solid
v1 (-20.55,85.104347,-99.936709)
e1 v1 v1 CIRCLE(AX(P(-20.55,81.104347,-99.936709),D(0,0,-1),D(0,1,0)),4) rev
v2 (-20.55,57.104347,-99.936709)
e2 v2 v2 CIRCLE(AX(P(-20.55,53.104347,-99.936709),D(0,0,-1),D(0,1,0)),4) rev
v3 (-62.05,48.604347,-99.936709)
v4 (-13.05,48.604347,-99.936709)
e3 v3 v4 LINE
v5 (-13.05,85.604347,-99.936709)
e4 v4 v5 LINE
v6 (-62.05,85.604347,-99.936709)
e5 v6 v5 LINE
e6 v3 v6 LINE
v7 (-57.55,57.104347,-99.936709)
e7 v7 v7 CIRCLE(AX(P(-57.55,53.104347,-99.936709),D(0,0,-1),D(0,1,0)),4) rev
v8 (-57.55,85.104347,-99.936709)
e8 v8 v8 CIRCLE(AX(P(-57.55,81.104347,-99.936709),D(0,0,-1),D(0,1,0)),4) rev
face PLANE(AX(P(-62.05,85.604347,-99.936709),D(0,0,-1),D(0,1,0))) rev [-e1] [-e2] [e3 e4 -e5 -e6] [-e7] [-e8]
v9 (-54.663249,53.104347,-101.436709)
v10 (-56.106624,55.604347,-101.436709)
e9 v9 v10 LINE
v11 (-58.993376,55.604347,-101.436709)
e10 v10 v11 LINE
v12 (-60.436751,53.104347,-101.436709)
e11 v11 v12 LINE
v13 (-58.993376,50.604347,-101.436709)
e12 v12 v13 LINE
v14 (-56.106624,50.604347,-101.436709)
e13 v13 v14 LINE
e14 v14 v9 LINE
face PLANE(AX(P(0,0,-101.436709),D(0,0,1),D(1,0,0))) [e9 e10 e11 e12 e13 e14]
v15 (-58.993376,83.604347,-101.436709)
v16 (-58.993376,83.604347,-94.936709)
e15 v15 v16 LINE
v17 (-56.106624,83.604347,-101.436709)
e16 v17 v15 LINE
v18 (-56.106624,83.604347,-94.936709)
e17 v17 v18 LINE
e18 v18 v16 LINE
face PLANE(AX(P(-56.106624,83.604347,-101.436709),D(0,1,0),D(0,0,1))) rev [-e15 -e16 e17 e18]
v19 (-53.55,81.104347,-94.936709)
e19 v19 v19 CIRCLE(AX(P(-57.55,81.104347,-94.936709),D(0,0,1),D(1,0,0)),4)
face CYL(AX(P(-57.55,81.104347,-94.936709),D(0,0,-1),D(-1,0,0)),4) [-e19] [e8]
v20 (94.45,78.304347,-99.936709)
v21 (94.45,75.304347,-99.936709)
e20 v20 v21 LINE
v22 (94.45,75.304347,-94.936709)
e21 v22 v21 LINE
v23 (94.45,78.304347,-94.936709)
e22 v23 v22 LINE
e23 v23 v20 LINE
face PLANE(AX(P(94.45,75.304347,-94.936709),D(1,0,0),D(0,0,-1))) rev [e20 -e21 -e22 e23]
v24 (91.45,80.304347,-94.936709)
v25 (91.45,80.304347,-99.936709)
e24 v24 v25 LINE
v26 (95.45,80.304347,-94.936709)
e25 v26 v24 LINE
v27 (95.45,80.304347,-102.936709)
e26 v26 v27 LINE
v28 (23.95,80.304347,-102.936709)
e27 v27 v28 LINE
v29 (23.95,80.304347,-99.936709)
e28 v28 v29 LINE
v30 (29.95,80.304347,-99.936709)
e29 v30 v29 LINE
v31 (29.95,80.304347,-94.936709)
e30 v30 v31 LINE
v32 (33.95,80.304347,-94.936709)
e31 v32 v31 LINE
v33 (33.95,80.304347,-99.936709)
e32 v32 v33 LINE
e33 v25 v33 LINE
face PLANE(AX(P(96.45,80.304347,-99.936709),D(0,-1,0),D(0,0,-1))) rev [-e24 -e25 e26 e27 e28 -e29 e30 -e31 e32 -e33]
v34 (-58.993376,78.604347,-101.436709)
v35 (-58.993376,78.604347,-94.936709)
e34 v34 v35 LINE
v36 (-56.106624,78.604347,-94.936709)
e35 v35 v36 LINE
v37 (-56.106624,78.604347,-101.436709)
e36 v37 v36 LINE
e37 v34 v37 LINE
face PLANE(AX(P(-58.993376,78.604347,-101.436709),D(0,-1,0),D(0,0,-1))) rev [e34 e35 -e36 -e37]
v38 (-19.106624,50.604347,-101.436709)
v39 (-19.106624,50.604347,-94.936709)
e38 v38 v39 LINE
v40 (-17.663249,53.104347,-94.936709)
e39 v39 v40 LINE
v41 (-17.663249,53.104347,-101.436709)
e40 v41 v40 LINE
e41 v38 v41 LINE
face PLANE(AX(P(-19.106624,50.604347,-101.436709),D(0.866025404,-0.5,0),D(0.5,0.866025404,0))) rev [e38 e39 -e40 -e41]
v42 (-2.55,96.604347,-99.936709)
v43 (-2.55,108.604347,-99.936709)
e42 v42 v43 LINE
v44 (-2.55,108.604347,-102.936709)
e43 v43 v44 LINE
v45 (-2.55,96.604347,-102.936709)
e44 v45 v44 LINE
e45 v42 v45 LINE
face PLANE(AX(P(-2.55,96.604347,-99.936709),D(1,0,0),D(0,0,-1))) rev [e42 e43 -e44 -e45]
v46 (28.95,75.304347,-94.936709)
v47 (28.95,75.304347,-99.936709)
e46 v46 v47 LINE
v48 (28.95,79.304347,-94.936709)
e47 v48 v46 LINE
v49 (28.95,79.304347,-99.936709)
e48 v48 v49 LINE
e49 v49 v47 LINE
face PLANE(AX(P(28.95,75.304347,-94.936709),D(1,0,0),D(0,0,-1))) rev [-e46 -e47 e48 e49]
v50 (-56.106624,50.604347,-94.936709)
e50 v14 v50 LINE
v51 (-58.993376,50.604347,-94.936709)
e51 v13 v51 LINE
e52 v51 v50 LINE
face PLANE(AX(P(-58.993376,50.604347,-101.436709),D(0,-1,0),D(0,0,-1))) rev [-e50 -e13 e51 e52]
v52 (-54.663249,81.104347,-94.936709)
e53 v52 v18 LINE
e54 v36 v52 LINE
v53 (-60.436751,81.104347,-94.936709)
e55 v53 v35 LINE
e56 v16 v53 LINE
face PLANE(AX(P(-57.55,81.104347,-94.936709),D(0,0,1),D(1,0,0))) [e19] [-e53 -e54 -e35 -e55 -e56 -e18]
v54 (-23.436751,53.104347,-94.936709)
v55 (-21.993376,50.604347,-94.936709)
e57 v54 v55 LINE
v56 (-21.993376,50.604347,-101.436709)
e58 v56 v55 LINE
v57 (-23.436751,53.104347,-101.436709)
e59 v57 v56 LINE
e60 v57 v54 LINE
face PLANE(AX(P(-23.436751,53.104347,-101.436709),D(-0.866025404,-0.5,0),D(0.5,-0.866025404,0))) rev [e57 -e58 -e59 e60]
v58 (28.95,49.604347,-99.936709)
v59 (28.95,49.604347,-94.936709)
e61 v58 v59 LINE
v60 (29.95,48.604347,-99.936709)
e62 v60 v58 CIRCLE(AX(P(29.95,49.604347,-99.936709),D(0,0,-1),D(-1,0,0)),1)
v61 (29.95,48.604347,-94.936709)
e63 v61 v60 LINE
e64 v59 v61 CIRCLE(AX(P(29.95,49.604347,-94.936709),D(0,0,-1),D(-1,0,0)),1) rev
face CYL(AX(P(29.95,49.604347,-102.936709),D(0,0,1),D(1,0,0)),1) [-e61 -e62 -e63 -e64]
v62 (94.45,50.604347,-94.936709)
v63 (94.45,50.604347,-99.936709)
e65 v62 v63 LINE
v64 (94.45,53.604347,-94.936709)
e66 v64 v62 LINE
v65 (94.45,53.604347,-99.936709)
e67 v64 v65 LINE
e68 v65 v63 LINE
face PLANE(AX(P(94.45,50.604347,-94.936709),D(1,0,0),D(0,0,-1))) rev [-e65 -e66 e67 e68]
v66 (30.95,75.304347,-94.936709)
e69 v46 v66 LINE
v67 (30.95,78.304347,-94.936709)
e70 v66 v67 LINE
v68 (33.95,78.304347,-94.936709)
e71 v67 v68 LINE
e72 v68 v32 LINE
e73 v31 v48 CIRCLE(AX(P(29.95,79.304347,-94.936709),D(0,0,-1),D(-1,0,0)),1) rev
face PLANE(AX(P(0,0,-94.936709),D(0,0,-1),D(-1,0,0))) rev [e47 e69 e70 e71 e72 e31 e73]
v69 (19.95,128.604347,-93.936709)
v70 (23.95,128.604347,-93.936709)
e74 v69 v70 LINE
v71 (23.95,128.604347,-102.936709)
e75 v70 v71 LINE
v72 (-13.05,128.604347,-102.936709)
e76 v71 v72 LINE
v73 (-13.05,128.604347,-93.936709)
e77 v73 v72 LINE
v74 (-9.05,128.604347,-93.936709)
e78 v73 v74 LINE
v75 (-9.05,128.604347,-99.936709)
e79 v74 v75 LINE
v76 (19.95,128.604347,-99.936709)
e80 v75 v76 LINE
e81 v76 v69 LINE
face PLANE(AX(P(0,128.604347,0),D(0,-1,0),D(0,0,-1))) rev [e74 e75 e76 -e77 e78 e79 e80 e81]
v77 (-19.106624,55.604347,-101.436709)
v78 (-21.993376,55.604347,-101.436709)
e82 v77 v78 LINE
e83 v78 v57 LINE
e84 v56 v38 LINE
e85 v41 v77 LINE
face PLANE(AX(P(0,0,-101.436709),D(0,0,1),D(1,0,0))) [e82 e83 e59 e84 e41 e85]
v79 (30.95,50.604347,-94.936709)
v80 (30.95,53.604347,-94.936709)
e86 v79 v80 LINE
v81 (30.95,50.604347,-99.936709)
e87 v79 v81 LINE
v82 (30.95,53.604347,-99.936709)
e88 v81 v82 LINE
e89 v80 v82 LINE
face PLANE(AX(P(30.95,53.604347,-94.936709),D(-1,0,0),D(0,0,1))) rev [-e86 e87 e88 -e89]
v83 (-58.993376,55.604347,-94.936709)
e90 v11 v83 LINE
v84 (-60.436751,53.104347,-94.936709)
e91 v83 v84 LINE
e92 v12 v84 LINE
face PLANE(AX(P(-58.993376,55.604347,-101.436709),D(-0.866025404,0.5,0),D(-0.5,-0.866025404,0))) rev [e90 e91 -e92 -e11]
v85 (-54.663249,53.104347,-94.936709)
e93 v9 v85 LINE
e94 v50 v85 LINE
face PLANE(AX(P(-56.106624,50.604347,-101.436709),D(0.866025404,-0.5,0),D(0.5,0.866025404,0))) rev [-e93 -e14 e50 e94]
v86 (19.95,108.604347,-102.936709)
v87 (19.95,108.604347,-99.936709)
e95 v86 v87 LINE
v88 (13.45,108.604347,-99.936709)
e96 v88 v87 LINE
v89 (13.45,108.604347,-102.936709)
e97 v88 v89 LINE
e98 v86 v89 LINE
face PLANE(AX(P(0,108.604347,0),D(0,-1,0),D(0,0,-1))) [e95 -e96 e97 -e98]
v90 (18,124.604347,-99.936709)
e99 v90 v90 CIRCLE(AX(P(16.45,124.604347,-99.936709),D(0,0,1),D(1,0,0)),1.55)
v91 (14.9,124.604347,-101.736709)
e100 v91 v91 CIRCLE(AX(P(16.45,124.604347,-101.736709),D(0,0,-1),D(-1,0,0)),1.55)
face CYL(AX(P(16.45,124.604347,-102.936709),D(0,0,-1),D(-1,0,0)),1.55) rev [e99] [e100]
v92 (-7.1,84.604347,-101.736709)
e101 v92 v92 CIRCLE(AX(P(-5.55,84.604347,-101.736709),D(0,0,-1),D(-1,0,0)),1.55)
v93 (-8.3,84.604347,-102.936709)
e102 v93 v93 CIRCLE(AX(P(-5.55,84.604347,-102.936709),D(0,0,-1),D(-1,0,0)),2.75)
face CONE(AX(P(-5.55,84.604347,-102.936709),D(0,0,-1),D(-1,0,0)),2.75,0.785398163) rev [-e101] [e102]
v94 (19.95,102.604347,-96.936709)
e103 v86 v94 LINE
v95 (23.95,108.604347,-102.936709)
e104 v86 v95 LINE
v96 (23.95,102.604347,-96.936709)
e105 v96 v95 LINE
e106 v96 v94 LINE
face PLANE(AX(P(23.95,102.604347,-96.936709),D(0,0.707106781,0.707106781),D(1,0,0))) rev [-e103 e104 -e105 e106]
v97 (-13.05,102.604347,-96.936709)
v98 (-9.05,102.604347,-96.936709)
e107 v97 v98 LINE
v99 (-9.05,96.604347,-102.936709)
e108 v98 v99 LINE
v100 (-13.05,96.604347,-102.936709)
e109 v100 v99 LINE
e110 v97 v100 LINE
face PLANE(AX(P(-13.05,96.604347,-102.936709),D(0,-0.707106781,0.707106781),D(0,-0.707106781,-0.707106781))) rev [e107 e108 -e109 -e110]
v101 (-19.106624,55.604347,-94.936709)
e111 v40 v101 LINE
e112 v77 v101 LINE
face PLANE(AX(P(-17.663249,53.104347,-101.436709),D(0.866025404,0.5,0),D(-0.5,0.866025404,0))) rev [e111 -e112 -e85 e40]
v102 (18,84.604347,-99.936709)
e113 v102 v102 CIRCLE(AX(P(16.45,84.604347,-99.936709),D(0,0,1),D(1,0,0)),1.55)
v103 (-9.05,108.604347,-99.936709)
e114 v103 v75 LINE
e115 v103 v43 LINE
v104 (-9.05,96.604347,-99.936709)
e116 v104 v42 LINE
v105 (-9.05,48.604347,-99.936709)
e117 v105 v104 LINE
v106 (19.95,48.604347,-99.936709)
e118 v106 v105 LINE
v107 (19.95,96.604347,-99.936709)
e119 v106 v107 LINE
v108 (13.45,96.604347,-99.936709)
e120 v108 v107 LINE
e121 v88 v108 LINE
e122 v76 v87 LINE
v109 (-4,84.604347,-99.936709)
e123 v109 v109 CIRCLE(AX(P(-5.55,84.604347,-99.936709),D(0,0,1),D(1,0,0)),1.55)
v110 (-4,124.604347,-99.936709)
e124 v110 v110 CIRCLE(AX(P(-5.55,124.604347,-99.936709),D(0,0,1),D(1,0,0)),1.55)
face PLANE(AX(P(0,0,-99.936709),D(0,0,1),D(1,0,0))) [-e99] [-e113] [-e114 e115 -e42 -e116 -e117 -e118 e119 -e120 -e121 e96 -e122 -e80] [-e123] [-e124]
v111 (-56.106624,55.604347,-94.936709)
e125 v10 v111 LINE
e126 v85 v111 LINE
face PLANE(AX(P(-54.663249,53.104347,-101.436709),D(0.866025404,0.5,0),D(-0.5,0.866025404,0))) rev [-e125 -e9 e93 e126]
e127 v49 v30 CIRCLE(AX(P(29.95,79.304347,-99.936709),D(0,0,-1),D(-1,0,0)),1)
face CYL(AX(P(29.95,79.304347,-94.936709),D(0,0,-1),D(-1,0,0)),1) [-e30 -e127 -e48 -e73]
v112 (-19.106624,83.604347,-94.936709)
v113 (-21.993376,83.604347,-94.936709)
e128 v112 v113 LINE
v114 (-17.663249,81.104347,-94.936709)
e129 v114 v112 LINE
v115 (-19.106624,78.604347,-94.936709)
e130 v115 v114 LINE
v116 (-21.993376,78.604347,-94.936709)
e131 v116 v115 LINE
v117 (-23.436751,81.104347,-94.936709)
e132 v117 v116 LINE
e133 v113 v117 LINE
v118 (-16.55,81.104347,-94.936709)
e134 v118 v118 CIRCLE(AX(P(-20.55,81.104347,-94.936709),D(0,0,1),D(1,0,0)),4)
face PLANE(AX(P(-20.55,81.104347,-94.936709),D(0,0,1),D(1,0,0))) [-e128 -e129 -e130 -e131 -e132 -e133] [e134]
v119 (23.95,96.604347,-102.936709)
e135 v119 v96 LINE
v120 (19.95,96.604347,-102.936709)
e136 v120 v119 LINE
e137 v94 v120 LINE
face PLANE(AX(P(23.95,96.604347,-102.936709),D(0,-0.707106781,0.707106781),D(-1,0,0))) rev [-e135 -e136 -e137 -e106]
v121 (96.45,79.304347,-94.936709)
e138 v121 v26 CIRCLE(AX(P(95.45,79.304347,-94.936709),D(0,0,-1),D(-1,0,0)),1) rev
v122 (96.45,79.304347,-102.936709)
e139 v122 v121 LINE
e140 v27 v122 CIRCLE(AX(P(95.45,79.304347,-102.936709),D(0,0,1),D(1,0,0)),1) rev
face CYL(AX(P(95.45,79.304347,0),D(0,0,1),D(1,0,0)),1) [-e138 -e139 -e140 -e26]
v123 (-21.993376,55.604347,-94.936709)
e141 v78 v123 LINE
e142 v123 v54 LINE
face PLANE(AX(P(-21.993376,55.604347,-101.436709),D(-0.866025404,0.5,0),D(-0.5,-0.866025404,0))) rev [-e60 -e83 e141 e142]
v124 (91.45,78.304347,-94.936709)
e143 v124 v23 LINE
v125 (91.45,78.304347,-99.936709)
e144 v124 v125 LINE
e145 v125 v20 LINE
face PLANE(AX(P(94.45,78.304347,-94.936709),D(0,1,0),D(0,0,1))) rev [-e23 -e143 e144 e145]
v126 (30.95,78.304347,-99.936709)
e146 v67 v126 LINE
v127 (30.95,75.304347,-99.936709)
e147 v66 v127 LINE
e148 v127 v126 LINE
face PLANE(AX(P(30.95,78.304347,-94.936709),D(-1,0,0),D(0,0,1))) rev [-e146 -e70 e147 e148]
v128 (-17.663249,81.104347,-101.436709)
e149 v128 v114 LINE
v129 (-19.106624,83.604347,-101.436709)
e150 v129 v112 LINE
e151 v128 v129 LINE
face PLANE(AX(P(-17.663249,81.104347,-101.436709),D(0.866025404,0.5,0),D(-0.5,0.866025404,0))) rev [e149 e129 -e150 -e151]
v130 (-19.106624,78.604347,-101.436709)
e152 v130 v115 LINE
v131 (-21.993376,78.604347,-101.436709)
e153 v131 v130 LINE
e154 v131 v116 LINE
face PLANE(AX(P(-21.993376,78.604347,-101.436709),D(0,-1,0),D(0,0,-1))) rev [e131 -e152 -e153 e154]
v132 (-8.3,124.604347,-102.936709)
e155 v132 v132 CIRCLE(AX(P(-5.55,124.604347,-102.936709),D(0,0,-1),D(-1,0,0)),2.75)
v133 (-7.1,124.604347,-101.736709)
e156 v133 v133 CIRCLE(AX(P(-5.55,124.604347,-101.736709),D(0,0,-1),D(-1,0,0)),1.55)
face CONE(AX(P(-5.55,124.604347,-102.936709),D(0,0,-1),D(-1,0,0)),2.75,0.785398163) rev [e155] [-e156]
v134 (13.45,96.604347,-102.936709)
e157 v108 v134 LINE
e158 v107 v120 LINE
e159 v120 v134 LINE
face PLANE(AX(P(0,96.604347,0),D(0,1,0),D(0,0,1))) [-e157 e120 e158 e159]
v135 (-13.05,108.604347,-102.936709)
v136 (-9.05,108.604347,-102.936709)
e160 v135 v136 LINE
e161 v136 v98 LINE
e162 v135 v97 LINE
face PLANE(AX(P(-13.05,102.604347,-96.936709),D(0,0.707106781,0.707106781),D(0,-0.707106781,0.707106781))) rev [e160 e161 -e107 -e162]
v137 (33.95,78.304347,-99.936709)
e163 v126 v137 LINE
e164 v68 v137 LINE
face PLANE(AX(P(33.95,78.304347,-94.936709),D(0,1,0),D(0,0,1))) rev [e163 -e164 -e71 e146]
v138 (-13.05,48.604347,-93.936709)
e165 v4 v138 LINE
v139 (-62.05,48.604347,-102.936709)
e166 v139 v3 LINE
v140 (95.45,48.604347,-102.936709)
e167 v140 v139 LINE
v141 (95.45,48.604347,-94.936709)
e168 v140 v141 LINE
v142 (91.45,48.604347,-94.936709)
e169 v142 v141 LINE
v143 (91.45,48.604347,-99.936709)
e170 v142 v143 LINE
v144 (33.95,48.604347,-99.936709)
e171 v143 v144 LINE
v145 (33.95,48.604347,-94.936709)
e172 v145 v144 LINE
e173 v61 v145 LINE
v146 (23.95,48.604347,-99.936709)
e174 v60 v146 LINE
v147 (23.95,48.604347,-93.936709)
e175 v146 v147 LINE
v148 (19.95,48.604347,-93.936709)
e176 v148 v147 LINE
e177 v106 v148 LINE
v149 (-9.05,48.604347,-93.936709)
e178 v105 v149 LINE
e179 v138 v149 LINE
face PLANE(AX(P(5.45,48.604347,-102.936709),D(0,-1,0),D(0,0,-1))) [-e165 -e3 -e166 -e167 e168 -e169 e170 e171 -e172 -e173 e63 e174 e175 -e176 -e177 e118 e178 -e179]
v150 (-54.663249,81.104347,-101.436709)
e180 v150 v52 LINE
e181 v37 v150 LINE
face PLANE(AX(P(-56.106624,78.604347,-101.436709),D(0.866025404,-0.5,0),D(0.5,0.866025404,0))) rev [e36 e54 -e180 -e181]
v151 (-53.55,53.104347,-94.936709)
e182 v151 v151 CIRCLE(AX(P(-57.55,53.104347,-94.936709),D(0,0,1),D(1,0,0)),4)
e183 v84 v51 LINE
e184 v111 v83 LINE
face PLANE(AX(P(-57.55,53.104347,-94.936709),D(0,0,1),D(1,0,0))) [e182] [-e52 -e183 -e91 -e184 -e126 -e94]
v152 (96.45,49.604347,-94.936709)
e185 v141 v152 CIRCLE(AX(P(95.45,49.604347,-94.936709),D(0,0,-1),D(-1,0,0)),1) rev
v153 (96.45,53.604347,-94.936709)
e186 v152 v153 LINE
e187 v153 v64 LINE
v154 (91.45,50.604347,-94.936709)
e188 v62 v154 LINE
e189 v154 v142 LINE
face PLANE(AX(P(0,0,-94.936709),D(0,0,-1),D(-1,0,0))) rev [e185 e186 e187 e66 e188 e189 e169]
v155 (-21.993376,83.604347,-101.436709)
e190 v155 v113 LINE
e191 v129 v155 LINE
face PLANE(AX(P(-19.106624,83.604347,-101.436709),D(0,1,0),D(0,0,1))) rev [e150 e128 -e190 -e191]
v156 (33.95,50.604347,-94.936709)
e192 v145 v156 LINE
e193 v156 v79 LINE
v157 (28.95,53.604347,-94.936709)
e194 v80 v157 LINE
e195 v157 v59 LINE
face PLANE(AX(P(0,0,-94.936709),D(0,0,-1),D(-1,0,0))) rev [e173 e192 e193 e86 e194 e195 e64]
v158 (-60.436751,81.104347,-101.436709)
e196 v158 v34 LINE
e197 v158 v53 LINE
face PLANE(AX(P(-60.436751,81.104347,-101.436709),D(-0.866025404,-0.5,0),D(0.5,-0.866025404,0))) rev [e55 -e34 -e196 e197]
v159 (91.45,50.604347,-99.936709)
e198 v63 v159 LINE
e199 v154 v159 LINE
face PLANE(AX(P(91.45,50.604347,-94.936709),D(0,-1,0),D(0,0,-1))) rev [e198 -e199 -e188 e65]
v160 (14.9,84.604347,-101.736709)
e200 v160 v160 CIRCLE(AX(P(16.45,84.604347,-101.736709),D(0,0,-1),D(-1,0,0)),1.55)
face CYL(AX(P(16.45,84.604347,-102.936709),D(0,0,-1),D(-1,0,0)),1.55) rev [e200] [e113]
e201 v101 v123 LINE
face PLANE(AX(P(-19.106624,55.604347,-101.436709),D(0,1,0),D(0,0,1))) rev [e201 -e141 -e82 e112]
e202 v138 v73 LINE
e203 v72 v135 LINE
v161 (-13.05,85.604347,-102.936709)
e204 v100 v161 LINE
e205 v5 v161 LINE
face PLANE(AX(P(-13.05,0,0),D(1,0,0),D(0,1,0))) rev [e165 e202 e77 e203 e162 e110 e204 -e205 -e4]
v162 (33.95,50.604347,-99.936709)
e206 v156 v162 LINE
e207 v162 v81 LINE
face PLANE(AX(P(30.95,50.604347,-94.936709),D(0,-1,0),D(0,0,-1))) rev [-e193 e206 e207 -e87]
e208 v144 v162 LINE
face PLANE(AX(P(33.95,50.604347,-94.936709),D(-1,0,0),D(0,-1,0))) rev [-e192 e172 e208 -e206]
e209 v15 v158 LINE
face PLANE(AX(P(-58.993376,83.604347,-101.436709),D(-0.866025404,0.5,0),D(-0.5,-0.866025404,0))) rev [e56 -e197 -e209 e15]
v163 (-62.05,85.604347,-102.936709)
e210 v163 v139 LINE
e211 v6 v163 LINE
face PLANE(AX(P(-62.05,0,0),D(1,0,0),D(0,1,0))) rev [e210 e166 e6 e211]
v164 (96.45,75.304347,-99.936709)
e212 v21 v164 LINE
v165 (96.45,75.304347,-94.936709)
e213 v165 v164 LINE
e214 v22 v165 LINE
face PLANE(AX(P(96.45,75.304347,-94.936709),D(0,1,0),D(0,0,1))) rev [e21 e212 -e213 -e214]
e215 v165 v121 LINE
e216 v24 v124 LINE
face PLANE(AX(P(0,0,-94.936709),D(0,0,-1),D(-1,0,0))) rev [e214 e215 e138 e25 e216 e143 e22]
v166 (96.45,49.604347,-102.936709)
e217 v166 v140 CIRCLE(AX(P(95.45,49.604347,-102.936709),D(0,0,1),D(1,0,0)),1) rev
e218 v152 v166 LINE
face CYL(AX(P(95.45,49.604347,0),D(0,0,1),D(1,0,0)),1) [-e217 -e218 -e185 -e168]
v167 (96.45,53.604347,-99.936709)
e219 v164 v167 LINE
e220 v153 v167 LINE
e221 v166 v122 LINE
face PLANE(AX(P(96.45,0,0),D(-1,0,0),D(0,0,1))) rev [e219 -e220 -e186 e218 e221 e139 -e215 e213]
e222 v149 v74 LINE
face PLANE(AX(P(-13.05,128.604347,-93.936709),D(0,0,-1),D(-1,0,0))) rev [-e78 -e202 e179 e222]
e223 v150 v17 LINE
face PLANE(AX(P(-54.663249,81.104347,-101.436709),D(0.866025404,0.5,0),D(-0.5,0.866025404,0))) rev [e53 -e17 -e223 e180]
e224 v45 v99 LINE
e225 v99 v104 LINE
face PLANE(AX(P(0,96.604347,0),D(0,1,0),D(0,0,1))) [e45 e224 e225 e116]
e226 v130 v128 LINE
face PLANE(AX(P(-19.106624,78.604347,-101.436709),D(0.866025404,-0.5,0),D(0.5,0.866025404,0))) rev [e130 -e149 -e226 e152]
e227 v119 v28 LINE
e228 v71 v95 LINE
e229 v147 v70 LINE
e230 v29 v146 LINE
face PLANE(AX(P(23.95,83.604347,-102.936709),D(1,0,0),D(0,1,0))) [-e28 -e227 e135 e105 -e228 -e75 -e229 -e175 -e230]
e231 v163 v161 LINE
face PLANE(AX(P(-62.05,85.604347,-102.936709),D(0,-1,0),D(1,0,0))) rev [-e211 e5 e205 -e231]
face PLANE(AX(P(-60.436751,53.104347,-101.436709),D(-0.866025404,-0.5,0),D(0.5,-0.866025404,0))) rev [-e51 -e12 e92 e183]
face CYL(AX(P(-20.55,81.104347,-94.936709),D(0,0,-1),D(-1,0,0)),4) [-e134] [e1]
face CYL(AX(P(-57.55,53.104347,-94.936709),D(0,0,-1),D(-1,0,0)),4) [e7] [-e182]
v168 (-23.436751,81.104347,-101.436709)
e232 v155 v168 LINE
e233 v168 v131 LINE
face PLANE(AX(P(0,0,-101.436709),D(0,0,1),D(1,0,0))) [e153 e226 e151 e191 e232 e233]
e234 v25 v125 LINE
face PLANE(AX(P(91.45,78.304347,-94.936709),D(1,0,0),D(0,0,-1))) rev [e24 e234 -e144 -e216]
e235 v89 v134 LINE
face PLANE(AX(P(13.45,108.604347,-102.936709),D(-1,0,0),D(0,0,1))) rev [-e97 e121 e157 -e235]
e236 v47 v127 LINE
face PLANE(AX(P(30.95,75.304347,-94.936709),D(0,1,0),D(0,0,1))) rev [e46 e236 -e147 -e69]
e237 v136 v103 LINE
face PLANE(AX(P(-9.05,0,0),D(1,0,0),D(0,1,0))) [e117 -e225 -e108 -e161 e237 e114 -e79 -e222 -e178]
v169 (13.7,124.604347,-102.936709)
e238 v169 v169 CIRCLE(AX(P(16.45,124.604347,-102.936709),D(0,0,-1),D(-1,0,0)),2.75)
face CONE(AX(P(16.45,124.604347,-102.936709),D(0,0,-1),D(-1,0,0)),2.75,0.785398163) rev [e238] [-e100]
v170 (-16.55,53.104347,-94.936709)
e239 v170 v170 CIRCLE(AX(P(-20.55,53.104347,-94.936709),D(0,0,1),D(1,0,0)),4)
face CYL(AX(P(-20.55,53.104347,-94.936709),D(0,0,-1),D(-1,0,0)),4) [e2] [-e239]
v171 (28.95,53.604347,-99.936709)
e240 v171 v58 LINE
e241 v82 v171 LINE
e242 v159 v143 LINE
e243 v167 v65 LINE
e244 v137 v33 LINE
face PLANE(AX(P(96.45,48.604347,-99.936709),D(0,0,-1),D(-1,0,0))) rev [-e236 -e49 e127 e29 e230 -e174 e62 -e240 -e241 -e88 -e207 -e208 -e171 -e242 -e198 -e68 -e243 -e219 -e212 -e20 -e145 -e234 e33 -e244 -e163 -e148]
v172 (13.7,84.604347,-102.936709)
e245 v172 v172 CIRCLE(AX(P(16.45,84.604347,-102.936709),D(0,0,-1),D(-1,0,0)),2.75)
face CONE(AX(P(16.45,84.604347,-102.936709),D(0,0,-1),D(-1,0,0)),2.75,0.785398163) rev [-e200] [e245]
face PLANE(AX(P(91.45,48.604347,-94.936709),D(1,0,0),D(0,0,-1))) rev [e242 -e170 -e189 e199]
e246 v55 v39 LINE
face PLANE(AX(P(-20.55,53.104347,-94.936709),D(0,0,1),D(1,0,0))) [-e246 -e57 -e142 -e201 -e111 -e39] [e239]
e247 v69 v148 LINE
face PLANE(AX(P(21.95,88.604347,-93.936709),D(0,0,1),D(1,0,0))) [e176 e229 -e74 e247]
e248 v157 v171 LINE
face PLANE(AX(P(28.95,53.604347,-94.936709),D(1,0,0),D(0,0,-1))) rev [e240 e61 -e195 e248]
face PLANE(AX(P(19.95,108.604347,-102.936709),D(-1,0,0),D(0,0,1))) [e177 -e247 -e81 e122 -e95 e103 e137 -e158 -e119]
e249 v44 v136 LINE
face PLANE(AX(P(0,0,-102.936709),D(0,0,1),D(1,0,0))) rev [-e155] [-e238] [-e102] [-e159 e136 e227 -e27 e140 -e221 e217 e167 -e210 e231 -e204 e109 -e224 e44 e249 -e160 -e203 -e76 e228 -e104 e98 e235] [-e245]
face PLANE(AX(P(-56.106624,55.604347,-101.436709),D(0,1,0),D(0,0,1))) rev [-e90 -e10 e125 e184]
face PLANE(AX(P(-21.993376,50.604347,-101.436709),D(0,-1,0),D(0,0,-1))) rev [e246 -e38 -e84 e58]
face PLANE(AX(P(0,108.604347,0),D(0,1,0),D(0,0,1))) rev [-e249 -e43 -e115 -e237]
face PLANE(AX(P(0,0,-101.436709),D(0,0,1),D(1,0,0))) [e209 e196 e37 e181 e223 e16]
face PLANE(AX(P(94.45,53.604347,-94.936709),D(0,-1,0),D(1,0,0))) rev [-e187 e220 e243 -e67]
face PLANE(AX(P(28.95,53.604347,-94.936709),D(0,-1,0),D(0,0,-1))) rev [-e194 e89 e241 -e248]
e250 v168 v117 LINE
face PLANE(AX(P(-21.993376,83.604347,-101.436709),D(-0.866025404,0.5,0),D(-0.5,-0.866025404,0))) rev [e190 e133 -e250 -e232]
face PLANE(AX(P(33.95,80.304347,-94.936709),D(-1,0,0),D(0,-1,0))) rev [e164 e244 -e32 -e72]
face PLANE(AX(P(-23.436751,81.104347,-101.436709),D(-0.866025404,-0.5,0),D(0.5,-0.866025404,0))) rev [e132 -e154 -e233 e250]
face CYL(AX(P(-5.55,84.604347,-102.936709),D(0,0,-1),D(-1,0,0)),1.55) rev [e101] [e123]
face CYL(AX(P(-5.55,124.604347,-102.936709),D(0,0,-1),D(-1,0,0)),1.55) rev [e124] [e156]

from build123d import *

# Parameters (mm, degrees)
BOSS_EXTRUDE1_START                               = 19.95
BOSS_EXTRUDE1_DEPTH                               = 4
SKETCH2_W                                         = 33
SKETCH2_H                                         = 60
BOSS_EXTRUDE2_DEPTH                               = 3
CUT_EXTRUDE1_DEPTH                                = 4
SKETCH4_W                                         = 29
SKETCH4_H                                         = 3
CUT_EXTRUDE2_DEPTH                                = 12
SKETCH5_W                                         = 22.5
SKETCH5_H                                         = 3
BOSS_EXTRUDE3_DEPTH                               = 12
BOSS_EXTRUDE4_DEPTH                               = 20
SKETCH7_W                                         = 6.5
SKETCH7_H                                         = 3
CUT_EXTRUDE3_DEPTH                                = 12
BOSS_EXTRUDE5_DEPTH                               = 4
SKETCH9_W                                         = 3
SKETCH9_H                                         = 37
BOSS_EXTRUDE6_DEPTH                               = 49
SKETCH10_W                                        = 3
SKETCH10_H                                        = 31.7
BOSS_EXTRUDE7_DEPTH                               = 72.5
CSK_FOR_M2_5_FLAT_HEAD_MACHINE_SCREW1_D           = 3.1
CSK_FOR_M2_5_FLAT_HEAD_MACHINE_SCREW1_CSINK_D     = 5.5
CSK_FOR_M2_5_FLAT_HEAD_MACHINE_SCREW1_CSINK_ANGLE = 90
BOSS_EXTRUDE8_DEPTH                               = 5
FILLET1_R                                         = 1
SKETCH26_R                                        = 4
BOSS_EXTRUDE10_DEPTH                              = 5
CUT_EXTRUDE4_DEPTH                                = 6.5


with BuildPart() as part:
    # Boss-Extrude1: read off the stored shape, not the designer's step
    # Boss-Extrude1 outline → Boss-Extrude1 (new body)
    with BuildSketch(Plane.YZ.offset(BOSS_EXTRUDE1_START)):
        Polygon((108.604346835, -99.936709039), (108.604346835, -93.936709039), (48.604346835, -93.936709039), (48.604346835, -99.936709039), (99.604346835, -99.936709039), (102.604346835, -96.936709039), (105.604346835, -99.936709039), align=None)
    extrude(amount=BOSS_EXTRUDE1_DEPTH)

    # Sketch2 → Boss-Extrude2 (add)
    with BuildSketch(Plane(origin=(0, 0, -99.936709039), x_dir=(-1, 0, 0), z_dir=(0, 0, -1))):
        with Locations((-7.45, 78.604346835)):
            Rectangle(SKETCH2_W, SKETCH2_H)
    extrude(amount=BOSS_EXTRUDE2_DEPTH)

    # Sketch3 → Cut-Extrude1 (cut)
    with BuildSketch(Plane(origin=(23.95, 0, 0), x_dir=(0, 0, -1), z_dir=(1, 0, 0))):
        Polygon((99.936709039, 99.604346835), (102.936709039, 96.604346835), (102.936709039, 108.604346835), (99.936709039, 105.604346835), align=None)
    extrude(amount=-CUT_EXTRUDE1_DEPTH, mode=Mode.SUBTRACT)

    # Sketch4 → Cut-Extrude2 (cut)
    with BuildSketch(Plane(origin=(0, 108.604346835, 0), x_dir=(-1, 0, 0), z_dir=(0, 1, 0))):
        with Locations((-5.45, -101.436709039)):
            Rectangle(SKETCH4_W, SKETCH4_H)
    extrude(amount=-CUT_EXTRUDE2_DEPTH, mode=Mode.SUBTRACT)

    # Sketch5 → Boss-Extrude3 (add)
    with BuildSketch(Plane(origin=(0, 96.604346835, 0), x_dir=(-1, 0, 0), z_dir=(0, 1, 0))):
        with Locations((-2.2, -101.436709039)):
            Rectangle(SKETCH5_W, SKETCH5_H)
    extrude(amount=BOSS_EXTRUDE3_DEPTH)

    # Sketch6 → Boss-Extrude4 (add)
    with BuildSketch(Plane(origin=(0, 108.604346835, 0), x_dir=(-1, 0, 0), z_dir=(0, 1, 0))):
        Polygon((9.05, -99.936709039), (9.05, -102.936709039), (-23.95, -102.936709039), (-23.95, -93.936709039), (-19.95, -93.936709039), (-19.95, -99.936709039), align=None)
    extrude(amount=BOSS_EXTRUDE4_DEPTH)

    # Sketch7 → Cut-Extrude3 (cut)
    with BuildSketch(Plane(origin=(0, 108.604346835, 0), x_dir=(1, 0, 0), z_dir=(0, 1, 0))):
        with Locations((-5.8, 101.436709039)):
            Rectangle(SKETCH7_W, SKETCH7_H)
    extrude(amount=-CUT_EXTRUDE3_DEPTH, mode=Mode.SUBTRACT)

    # Sketch8 → Boss-Extrude5 (add)
    with BuildSketch(Plane.ZY.offset(9.05)):
        Polygon((-102.936709039, 96.604346835), (-96.936709039, 102.604346835), (-102.936709039, 108.604346835), (-102.936709039, 128.604346835), (-93.936709039, 128.604346835), (-93.936709039, 48.604346835), (-102.936709039, 48.604346835), align=None)
    extrude(amount=BOSS_EXTRUDE5_DEPTH)

    # Sketch9 → Boss-Extrude6 (add)
    with BuildSketch(Plane.ZY.offset(13.05)):
        with Locations((-101.436709039, 67.104346835)):
            Rectangle(SKETCH9_W, SKETCH9_H)
    extrude(amount=BOSS_EXTRUDE6_DEPTH)

    # Sketch10 → Boss-Extrude7 (add)
    with BuildSketch(Plane(origin=(23.95, 0, 0), x_dir=(0, 0, -1), z_dir=(1, 0, 0))):
        with Locations((101.436709039, 64.454346835)):
            Rectangle(SKETCH10_W, SKETCH10_H)
    extrude(amount=BOSS_EXTRUDE7_DEPTH)

    # CSK for M2.5 Flat Head Machine Screw1 (through all)
    with Locations(Plane(origin=(0, 0, -102.936709039), x_dir=(-1, 0, 0), z_dir=(0, 0, -1))):
        with Locations((-16.45, 124.604346835), (-16.45, 84.604346835), (5.55, 124.604346835), (5.55, 84.604346835)):
            CounterSinkHole(CSK_FOR_M2_5_FLAT_HEAD_MACHINE_SCREW1_D / 2, CSK_FOR_M2_5_FLAT_HEAD_MACHINE_SCREW1_CSINK_D / 2, counter_sink_angle=CSK_FOR_M2_5_FLAT_HEAD_MACHINE_SCREW1_CSINK_ANGLE)

    # Sketch24 → Boss-Extrude8 (add)
    with BuildSketch(Plane.XY.offset(-99.936709039)):
        Polygon((28.95, 75.304346835), (28.95, 80.304346835), (33.95, 80.304346835), (33.95, 78.304346835), (30.95, 78.304346835), (30.95, 75.304346835), align=None)
        Polygon((91.45, 78.304346835), (91.45, 80.304346835), (96.45, 80.304346835), (96.45, 75.304346835), (94.45, 75.304346835), (94.45, 78.304346835), align=None)
        Polygon((28.95, 53.604346835), (28.95, 48.604346835), (33.95, 48.604346835), (33.95, 50.604346835), (30.95, 50.604346835), (30.95, 53.604346835), align=None)
        Polygon((96.45, 53.604346835), (96.45, 48.604346835), (91.45, 48.604346835), (91.45, 50.604346835), (94.45, 50.604346835), (94.45, 53.604346835), align=None)
    extrude(amount=BOSS_EXTRUDE8_DEPTH)

    # Fillet1
    fillet1_edges = [part.edges().sort_by_distance(p)[0] for p in [
        (96.45, 80.304346835, -98.936709039),
        (96.45, 48.604346835, -98.936709039),
        (28.95, 80.304346835, -97.436709039),
        (28.95, 48.604346835, -97.436709039),
    ]]
    fillet(fillet1_edges, radius=FILLET1_R)

    # Sketch26 → Boss-Extrude10 (add)
    with BuildSketch(Plane.XY.offset(-99.936709039)):
        with Locations(Location((-57.55, 81.104346835, 0), (0, 0, 90))):
            Circle(SKETCH26_R)
        with Locations(Location((-20.55, 81.104346835, 0), (0, 0, 90))):
            Circle(SKETCH26_R)
        with Locations(Location((-20.55, 53.104346835, 0), (0, 0, 90))):
            Circle(SKETCH26_R)
        with Locations(Location((-57.55, 53.104346835, 0), (0, 0, 90))):
            Circle(SKETCH26_R)
    extrude(amount=BOSS_EXTRUDE10_DEPTH)

    # Sketch27 → Cut-Extrude4 (cut)
    with BuildSketch(Plane.XY.offset(-94.936709039)):
        Polygon((-54.663248654, 81.104346835), (-56.106624327, 83.604346835), (-58.993375673, 83.604346835), (-60.436751346, 81.104346835), (-58.993375673, 78.604346835), (-56.106624327, 78.604346835), align=None)
        Polygon((-17.663248654, 81.104346835), (-19.106624327, 83.604346835), (-21.993375673, 83.604346835), (-23.436751346, 81.104346835), (-21.993375673, 78.604346835), (-19.106624327, 78.604346835), align=None)
        Polygon((-17.663248654, 53.104346835), (-19.106624327, 55.604346835), (-21.993375673, 55.604346835), (-23.436751346, 53.104346835), (-21.993375673, 50.604346835), (-19.106624327, 50.604346835), align=None)
        Polygon((-54.663248654, 53.104346835), (-56.106624327, 55.604346835), (-58.993375673, 55.604346835), (-60.436751346, 53.104346835), (-58.993375673, 50.604346835), (-56.106624327, 50.604346835), align=None)
    extrude(amount=-CUT_EXTRUDE4_DEPTH, mode=Mode.SUBTRACT)


solid = part.part
